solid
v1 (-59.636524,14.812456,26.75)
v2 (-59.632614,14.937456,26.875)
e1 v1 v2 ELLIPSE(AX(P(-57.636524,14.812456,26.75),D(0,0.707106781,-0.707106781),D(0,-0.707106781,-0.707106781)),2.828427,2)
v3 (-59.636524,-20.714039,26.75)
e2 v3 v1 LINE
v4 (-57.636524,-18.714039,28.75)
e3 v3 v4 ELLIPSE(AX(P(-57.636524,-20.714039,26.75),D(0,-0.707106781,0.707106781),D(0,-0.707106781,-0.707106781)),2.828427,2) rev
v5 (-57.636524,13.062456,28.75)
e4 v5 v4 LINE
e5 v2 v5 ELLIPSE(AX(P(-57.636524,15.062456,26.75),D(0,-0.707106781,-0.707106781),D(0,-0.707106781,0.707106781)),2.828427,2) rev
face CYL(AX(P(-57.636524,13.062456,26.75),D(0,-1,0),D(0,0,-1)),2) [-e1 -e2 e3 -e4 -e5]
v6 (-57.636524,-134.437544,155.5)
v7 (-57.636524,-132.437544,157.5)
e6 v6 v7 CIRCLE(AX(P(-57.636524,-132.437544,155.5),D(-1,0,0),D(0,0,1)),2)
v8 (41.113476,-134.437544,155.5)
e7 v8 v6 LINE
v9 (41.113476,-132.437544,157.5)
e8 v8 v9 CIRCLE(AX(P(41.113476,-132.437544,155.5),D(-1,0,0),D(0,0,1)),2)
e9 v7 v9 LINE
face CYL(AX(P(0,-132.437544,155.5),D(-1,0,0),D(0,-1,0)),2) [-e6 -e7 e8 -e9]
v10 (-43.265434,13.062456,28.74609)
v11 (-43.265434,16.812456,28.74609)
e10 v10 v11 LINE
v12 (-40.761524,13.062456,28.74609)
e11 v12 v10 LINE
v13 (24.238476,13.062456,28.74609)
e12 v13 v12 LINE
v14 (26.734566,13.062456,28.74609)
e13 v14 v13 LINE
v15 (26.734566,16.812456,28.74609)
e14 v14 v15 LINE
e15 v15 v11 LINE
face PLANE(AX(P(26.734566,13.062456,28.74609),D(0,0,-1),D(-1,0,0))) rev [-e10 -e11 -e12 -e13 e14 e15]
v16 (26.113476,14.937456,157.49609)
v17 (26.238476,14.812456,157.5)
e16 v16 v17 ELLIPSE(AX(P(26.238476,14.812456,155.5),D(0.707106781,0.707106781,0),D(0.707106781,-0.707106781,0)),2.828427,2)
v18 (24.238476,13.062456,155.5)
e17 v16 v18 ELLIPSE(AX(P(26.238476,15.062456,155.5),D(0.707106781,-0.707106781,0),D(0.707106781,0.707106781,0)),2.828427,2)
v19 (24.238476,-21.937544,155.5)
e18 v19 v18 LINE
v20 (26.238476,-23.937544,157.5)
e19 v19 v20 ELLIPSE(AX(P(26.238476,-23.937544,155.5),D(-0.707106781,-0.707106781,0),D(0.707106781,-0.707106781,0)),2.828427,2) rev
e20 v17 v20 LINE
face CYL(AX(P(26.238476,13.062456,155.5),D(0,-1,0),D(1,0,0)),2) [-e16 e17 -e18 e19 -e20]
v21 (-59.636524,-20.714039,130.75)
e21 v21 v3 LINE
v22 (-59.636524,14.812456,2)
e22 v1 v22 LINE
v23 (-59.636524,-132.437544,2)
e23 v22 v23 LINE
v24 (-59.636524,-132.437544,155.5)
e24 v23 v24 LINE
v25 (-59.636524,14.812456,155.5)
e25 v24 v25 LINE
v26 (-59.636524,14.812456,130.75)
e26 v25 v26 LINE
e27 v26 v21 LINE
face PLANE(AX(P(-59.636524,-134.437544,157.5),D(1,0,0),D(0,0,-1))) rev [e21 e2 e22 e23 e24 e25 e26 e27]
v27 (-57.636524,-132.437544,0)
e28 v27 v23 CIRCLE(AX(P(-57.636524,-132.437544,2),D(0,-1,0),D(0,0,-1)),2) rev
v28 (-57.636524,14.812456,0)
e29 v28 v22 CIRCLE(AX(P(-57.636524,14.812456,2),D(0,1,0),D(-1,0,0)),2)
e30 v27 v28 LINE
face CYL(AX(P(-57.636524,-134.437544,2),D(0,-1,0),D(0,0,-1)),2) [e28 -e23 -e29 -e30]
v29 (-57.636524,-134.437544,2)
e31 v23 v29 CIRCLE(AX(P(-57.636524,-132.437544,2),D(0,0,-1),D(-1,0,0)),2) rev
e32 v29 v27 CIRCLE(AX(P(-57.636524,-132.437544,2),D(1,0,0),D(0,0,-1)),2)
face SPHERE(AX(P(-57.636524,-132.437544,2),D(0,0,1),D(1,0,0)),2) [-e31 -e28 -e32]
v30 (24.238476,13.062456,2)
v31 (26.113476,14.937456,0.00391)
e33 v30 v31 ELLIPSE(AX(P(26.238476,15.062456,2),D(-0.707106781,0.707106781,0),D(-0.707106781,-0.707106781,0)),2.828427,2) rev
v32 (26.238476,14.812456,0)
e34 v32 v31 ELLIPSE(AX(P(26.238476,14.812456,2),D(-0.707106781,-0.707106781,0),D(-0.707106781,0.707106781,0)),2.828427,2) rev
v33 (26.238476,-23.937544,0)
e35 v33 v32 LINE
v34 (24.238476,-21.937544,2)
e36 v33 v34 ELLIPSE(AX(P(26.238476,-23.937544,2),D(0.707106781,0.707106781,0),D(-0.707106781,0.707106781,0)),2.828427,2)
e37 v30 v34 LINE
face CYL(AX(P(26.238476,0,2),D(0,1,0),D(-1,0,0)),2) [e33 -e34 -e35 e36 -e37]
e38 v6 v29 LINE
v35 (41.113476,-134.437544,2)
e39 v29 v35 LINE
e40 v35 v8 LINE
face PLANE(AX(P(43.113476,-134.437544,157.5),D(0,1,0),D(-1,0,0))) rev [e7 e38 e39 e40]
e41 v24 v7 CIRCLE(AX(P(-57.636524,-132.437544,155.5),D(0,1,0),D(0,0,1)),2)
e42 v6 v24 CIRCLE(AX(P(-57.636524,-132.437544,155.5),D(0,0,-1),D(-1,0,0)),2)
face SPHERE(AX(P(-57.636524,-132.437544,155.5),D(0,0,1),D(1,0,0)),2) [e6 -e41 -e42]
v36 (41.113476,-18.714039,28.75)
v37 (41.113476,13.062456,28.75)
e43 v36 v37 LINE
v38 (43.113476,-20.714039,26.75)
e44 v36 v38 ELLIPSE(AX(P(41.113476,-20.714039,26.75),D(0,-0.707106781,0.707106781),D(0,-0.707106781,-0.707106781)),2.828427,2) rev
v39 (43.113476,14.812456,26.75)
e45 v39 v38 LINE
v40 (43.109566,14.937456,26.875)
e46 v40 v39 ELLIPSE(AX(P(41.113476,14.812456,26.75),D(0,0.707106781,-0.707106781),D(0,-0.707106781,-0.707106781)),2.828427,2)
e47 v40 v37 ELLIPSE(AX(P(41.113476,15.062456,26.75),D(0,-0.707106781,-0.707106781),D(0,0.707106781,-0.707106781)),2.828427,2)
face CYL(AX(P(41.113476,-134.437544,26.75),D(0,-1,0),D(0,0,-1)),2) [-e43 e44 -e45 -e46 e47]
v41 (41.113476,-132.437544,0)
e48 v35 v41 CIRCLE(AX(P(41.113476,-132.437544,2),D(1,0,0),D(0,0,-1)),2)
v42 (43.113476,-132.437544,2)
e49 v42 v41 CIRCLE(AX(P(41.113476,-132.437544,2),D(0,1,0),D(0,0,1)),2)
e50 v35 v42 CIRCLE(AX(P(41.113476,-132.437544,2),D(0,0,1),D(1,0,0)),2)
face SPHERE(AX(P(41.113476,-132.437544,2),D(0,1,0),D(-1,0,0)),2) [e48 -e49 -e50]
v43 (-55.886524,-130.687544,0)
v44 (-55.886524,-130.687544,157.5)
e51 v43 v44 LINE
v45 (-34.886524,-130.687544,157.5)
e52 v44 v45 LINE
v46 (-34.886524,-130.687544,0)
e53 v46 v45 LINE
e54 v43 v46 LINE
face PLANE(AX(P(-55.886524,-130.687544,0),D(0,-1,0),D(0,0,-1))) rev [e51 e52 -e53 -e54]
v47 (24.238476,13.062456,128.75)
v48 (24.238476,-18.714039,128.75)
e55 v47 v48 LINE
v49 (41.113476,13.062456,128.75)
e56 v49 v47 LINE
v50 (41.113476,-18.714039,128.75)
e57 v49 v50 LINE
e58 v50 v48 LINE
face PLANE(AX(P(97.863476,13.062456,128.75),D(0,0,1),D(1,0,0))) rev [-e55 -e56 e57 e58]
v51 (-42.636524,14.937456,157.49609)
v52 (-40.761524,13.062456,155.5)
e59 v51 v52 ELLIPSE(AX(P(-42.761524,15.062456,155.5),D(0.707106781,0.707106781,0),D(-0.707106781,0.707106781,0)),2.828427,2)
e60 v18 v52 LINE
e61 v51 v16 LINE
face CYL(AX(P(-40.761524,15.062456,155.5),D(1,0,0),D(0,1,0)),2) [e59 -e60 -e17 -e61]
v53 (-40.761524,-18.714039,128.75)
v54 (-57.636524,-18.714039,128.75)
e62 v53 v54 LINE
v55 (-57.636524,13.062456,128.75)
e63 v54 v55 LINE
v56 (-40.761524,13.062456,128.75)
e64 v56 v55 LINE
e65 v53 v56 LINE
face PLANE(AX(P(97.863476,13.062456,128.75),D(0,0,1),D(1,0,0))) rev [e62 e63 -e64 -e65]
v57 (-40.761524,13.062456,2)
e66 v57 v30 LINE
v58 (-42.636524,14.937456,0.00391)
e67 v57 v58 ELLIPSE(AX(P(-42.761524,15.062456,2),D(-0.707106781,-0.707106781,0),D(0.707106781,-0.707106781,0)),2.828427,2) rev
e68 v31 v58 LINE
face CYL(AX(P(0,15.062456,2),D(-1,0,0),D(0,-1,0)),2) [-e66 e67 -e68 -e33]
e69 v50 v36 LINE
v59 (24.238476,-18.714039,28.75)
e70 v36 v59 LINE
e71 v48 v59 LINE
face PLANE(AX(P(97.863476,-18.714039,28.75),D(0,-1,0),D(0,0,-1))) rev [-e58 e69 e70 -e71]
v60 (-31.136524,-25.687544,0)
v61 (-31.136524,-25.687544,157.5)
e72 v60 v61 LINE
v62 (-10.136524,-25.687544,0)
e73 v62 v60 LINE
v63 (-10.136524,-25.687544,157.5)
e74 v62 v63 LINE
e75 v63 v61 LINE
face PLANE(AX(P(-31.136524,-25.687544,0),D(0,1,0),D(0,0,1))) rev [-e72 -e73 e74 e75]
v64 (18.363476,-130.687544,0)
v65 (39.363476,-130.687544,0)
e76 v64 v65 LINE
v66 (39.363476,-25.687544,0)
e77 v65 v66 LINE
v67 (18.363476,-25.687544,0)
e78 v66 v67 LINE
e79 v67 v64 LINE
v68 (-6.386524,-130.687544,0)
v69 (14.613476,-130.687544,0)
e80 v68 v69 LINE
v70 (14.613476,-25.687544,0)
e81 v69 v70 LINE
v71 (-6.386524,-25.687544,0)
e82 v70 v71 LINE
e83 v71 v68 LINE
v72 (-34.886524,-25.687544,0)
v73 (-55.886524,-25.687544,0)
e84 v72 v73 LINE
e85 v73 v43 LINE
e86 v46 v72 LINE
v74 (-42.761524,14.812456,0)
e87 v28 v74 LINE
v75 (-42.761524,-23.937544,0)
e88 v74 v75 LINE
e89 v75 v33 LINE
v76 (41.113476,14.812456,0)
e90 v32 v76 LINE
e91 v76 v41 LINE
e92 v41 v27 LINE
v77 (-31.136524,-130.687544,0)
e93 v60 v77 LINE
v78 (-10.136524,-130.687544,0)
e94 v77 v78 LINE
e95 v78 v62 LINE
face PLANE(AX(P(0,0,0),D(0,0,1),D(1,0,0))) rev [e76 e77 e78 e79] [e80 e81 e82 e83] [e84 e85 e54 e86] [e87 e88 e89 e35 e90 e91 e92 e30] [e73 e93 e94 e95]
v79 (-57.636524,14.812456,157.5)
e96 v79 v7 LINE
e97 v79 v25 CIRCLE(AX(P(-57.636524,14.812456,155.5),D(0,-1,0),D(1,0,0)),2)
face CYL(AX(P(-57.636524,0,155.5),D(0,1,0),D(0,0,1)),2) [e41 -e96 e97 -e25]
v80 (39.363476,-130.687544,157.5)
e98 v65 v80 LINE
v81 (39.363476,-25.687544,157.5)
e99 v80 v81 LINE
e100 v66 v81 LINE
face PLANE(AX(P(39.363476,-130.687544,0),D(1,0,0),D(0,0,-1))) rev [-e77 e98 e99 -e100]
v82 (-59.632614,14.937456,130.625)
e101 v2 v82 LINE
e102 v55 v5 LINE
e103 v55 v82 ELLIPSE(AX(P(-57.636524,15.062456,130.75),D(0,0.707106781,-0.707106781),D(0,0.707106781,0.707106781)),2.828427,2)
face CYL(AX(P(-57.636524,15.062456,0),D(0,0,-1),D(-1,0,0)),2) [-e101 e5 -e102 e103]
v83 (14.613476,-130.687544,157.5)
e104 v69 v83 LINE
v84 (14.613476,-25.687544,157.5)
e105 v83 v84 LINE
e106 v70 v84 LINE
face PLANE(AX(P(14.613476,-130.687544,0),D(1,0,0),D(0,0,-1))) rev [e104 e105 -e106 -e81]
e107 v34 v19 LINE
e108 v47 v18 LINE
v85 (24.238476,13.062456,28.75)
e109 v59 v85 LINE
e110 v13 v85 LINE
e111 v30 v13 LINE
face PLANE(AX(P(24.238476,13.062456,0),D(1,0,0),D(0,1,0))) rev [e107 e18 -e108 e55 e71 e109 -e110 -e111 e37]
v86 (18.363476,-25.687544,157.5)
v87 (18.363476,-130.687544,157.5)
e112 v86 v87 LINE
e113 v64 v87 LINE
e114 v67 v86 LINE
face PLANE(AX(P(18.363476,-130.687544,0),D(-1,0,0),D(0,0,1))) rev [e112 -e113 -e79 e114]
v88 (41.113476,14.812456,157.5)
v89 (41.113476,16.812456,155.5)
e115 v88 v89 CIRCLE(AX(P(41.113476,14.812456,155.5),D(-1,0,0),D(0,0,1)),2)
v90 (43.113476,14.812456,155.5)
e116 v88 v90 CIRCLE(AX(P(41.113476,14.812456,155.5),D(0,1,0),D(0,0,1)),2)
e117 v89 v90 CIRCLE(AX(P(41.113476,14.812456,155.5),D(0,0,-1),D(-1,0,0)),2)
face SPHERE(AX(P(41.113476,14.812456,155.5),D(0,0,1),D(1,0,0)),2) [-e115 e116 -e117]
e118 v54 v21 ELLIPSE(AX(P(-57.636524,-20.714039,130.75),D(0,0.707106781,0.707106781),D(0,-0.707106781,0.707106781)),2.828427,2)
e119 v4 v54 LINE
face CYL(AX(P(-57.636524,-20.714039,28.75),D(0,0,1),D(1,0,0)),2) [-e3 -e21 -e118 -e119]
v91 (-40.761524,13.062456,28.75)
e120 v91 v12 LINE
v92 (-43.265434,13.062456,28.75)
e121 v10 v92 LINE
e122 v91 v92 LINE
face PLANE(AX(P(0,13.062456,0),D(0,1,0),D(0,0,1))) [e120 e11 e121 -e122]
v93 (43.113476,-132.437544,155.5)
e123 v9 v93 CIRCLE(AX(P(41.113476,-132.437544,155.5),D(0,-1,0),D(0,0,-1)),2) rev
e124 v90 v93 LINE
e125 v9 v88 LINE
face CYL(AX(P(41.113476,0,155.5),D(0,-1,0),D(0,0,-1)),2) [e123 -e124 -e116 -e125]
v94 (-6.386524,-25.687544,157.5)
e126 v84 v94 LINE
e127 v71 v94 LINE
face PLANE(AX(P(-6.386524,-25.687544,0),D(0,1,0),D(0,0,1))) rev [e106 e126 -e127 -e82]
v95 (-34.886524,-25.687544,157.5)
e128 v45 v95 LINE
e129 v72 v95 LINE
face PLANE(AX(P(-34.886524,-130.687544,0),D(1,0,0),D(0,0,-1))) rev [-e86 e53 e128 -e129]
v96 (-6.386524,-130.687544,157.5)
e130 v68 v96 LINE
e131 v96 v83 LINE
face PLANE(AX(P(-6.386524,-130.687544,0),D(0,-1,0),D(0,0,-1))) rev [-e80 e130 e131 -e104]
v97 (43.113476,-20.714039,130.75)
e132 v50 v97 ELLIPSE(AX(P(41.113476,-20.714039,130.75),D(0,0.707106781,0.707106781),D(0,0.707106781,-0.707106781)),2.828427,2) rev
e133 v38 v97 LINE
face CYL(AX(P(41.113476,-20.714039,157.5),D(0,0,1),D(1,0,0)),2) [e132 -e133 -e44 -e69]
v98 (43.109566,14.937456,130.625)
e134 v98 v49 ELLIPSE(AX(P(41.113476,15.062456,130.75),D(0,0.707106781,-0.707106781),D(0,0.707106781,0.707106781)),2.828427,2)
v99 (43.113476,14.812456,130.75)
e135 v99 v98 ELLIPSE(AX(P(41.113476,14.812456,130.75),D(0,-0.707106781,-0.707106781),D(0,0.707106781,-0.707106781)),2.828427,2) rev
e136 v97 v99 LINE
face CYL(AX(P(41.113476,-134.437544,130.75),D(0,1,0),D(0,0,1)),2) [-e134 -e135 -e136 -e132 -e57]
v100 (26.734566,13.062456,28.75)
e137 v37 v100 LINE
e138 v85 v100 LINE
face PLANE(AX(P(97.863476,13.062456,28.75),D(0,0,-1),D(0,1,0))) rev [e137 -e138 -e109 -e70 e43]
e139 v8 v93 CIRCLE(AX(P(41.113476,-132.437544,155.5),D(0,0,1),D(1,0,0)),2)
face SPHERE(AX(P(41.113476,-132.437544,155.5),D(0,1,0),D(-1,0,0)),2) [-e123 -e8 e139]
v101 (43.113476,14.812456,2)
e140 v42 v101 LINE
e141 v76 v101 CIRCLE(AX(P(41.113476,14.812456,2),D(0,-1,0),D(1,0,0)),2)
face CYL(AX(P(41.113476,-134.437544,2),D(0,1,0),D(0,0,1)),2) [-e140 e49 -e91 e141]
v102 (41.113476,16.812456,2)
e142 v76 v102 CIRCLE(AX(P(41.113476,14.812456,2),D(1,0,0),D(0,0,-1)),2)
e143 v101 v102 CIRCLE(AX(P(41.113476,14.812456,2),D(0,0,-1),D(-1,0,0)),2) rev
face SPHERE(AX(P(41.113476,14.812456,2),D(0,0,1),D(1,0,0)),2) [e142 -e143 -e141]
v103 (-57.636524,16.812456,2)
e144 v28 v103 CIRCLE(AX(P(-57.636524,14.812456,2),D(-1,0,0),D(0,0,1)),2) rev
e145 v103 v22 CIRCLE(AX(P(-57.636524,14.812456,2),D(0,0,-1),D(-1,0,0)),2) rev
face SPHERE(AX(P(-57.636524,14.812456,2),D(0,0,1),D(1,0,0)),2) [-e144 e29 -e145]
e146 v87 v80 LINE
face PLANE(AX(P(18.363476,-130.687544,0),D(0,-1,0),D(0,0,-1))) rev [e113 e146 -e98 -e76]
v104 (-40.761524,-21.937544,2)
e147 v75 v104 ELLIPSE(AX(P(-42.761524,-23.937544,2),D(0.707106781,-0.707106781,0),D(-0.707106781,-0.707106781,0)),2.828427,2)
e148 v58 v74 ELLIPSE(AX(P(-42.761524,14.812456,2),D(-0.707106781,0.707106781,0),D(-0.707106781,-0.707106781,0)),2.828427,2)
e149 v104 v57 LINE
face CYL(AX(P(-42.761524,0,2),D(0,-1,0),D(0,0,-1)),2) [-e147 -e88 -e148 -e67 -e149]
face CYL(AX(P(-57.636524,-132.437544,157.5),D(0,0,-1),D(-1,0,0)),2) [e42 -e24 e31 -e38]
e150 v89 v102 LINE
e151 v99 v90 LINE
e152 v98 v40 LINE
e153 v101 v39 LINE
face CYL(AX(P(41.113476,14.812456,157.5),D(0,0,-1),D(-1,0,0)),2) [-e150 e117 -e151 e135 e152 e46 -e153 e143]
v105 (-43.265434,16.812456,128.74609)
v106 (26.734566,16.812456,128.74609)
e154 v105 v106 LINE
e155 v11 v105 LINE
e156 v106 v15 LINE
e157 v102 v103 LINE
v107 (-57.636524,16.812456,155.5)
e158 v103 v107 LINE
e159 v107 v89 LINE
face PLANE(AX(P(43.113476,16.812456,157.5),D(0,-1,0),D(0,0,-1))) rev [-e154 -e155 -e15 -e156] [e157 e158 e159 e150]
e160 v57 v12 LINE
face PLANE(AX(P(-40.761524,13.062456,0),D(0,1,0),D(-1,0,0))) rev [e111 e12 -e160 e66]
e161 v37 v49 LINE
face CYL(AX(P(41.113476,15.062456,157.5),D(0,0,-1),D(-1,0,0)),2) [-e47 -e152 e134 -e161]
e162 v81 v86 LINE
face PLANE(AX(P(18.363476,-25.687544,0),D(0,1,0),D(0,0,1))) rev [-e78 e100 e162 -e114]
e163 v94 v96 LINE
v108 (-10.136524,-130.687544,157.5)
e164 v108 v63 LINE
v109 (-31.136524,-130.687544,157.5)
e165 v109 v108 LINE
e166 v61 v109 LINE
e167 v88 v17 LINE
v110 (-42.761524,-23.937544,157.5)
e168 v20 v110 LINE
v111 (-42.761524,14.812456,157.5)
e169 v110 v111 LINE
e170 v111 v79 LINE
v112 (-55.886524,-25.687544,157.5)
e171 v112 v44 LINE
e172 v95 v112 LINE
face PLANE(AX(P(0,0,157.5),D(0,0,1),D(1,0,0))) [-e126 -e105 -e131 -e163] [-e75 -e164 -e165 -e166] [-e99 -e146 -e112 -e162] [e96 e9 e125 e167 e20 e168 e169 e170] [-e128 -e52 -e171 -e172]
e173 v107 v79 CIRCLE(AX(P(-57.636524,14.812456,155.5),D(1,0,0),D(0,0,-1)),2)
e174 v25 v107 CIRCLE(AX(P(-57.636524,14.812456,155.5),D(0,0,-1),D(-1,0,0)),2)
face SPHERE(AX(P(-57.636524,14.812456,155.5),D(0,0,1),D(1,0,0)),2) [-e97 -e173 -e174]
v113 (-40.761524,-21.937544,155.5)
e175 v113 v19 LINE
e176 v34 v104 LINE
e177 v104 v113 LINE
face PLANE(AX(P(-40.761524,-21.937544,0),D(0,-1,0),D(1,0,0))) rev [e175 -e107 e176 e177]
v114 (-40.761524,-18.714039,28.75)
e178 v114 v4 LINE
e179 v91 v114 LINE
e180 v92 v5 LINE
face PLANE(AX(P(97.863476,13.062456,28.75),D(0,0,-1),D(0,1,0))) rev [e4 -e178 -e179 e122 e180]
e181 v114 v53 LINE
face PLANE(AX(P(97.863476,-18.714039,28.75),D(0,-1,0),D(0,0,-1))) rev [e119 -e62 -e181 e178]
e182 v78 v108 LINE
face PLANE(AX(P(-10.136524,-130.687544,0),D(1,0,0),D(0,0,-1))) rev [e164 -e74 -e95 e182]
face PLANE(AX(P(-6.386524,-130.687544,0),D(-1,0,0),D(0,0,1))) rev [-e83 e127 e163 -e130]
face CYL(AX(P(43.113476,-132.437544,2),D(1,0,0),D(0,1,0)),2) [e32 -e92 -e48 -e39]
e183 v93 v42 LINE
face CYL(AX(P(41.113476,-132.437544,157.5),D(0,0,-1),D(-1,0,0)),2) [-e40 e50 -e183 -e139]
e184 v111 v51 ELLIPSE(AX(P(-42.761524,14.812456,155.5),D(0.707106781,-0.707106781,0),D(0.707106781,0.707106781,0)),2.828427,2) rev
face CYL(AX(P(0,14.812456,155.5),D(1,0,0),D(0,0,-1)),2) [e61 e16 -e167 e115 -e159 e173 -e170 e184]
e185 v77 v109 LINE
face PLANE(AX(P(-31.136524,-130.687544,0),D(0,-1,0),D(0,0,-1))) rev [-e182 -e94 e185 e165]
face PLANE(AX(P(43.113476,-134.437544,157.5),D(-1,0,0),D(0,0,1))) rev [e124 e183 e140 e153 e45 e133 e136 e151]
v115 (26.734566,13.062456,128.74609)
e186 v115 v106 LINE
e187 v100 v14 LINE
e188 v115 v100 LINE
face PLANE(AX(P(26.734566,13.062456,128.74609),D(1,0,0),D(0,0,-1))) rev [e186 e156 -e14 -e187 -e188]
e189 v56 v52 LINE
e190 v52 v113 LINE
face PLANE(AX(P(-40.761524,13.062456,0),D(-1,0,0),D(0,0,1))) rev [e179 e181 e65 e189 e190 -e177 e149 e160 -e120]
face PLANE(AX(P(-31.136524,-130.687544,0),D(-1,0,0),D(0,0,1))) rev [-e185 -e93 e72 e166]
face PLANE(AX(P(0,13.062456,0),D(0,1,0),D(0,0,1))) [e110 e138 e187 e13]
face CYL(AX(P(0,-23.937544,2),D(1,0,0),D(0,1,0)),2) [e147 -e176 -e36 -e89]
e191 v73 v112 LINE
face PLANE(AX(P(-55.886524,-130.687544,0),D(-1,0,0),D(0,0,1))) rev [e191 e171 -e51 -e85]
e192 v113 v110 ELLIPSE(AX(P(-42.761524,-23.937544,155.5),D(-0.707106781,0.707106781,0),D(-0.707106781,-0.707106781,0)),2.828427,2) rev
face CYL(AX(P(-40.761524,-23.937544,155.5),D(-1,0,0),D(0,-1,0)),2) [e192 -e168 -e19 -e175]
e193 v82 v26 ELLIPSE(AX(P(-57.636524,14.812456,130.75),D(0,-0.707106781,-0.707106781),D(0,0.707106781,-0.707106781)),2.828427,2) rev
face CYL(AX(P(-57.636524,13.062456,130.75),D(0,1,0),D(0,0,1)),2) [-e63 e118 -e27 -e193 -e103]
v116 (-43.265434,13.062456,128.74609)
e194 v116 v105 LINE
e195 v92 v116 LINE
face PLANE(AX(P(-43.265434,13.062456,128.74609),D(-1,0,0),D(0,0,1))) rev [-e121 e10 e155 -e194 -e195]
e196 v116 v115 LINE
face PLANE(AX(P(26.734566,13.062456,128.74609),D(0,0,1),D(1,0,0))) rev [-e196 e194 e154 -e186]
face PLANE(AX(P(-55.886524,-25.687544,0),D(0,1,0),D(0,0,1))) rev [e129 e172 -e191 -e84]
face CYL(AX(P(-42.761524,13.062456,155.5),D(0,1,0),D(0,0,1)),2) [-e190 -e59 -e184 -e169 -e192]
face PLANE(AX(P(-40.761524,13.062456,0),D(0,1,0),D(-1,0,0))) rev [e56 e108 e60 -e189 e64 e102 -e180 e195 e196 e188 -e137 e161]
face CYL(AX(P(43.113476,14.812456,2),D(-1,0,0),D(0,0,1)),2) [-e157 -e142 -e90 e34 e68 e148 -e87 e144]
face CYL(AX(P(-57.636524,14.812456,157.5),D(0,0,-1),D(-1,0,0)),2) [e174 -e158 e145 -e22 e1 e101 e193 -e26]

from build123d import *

# Parameters (mm, degrees)
SKETCH7_W           = 102.75
SKETCH7_H           = 151.25
BOSS_EXTRUDE4_DEPTH = 157.5
SKETCH9_W           = 65
SKETCH9_H           = 35
SKETCH9_W_2         = 21
SKETCH9_H_2         = 105
CUT_EXTRUDE5_DEPTH  = 157.5
SKETCH10_W          = 100
SKETCH10_H          = 31.776495021
CUT_EXTRUDE6_DEPTH  = 157.5
FILLET3_R           = 2
FILLET4_R           = 2
FILLET6_R           = 2
FILLET7_R           = 2
FILLET8_R           = 2
FILLET9_R           = 2
SKETCH13_W          = 70
SKETCH13_H          = 100
CUT_EXTRUDE7_DEPTH  = 3.75


with BuildPart() as part:
    # Sketch7 → Boss-Extrude4 (new body)
    with BuildSketch(Plane.XY):
        with Locations((-8.261523783, -58.812543528)):
            Rectangle(SKETCH7_W, SKETCH7_H)
    extrude(amount=BOSS_EXTRUDE4_DEPTH)

    # Sketch9 → Cut-Extrude5 (cut)
    with BuildSketch(Plane.XY.offset(157.5)):
        with Locations((-8.261523783, -4.437543528)):
            Rectangle(SKETCH9_W, SKETCH9_H)
        with Locations((-45.386523783, -78.187543528)):
            Rectangle(SKETCH9_W_2, SKETCH9_H_2)
        with Locations((-20.636523783, -78.187543528)):
            Rectangle(SKETCH9_W_2, SKETCH9_H_2)
        with Locations((4.113476217, -78.187543528)):
            Rectangle(SKETCH9_W_2, SKETCH9_H_2)
        with Locations((28.863476217, -78.187543528)):
            Rectangle(SKETCH9_W_2, SKETCH9_H_2)
    extrude(amount=-CUT_EXTRUDE5_DEPTH, mode=Mode.SUBTRACT)

    # Sketch10 → Cut-Extrude6 (cut)
    with BuildSketch(Plane.ZY.offset(59.636523783)):
        with Locations((78.75, -2.825791039)):
            Rectangle(SKETCH10_W, SKETCH10_H)
    extrude(amount=-CUT_EXTRUDE6_DEPTH, mode=Mode.SUBTRACT)

    # Fillet3
    fillet3_edges = [part.edges().sort_by_distance(p)[0] for p in [
        (43.113476217, 16.812456472, 78.75),
    ]]
    fillet(fillet3_edges, radius=FILLET3_R)

    # Fillet4
    fillet4_edges = [part.edges().sort_by_distance(p)[0] for p in [
        (-9.261523783, 16.812456472, 0),
        (-9.261523783, 16.812456472, 157.5),
        (42.52768978, 16.226670034, 0),
        (42.52768978, 16.226670034, 157.5),
        (43.113476217, -59.812543528, 157.5),
        (43.113476217, -59.812543528, 0),
        (-59.636523783, 16.812456472, 78.75),
    ]]
    fillet(fillet4_edges, radius=FILLET4_R)

    # Fillet6
    # the kernel refuses this fillet: 2 mm, written as the material it takes off along each edge
    with BuildSketch(Plane(origin=(-57.636523783, 14.812456472, 155.5), x_dir=(-1, 0, 0), z_dir=(0, 0, 1))) as fillet6_piece_1_section:
        Polygon((0, 0), (FILLET6_R, 0), (FILLET6_R, -FILLET6_R), (0, -FILLET6_R), align=None)
    fillet6_piece_1 = extrude(amount=FILLET6_R, mode=Mode.PRIVATE)
    fillet6_piece_1 = fillet6_piece_1 - Plane(origin=(-57.636523783, 14.812456472, 155.5), x_dir=(0.7071067811865475, -0.7071067811865475, 0), z_dir=(0, 0, 1)) * Sphere(FILLET6_R, mode=Mode.PRIVATE)
    add(fillet6_piece_1, mode=Mode.SUBTRACT)
    with BuildSketch(Plane(origin=(-57.636523783, 14.812456472, 2), x_dir=(-1, 0, 0), z_dir=(0, 0, -1))) as fillet6_piece_2_section:
        Polygon((0, 0), (FILLET6_R, 0), (FILLET6_R, FILLET6_R), (0, FILLET6_R), align=None)
    fillet6_piece_2 = extrude(amount=FILLET6_R, mode=Mode.PRIVATE)
    fillet6_piece_2 = fillet6_piece_2 - Plane(origin=(-57.636523783, 14.812456472, 2), x_dir=(0.7071067811865475, -0.7071067811865475, 0), z_dir=(0, 0, -1)) * Sphere(FILLET6_R, mode=Mode.PRIVATE)
    add(fillet6_piece_2, mode=Mode.SUBTRACT)
    with BuildSketch(Plane(origin=(-59.636523783, -139.437543528, 0), x_dir=(1, 0, 0), z_dir=(0, 1, 0))) as fillet6_piece_3:
        with BuildLine():
            CenterArc((FILLET6_R, -FILLET6_R), FILLET6_R, 90, 90)
            Line((0, -FILLET6_R), (0, 0))
            Line((0, 0), (FILLET6_R, 0))
        make_face()
    extrude(amount=154.25, mode=Mode.SUBTRACT)
    with BuildSketch(Plane(origin=(-59.636523783, -139.437543528, 157.5), x_dir=(1, 0, 0), z_dir=(0, 1, 0))) as fillet6_piece_4:
        with BuildLine():
            CenterArc((FILLET6_R, FILLET6_R), FILLET6_R, 180, 90)
            Line((0, FILLET6_R), (0, 0))
            Line((0, 0), (FILLET6_R, 0))
        make_face()
    extrude(amount=154.25, mode=Mode.SUBTRACT)
    with BuildSketch(Plane(origin=(-59.636523783, -134.437543528, -5), x_dir=(1, 0, 0), z_dir=(0, 0, 1))) as fillet6_piece_5:
        with BuildLine():
            CenterArc((FILLET6_R, FILLET6_R), FILLET6_R, 180, 90)
            Line((0, FILLET6_R), (0, 0))
            Line((0, 0), (FILLET6_R, 0))
        make_face()
    extrude(amount=167.5, mode=Mode.SUBTRACT)

    # Fillet7
    # the kernel refuses this fillet: 2 mm, written as the material it takes off along each edge
    with BuildSketch(Plane(origin=(-57.636523783, -132.437543528, 155.5), x_dir=(0, 0, 1), z_dir=(0, -1, 0))) as fillet7_piece_1_section:
        Polygon((0, 0), (FILLET7_R, 0), (FILLET7_R, FILLET7_R), (0, FILLET7_R), align=None)
    fillet7_piece_1 = extrude(amount=FILLET7_R, mode=Mode.PRIVATE)
    fillet7_piece_1 = fillet7_piece_1 - Plane(origin=(-57.636523783, -132.437543528, 155.5), x_dir=(0.7071067811865475, 0, -0.7071067811865475), z_dir=(0, -1, 0)) * Sphere(FILLET7_R, mode=Mode.PRIVATE)
    add(fillet7_piece_1, mode=Mode.SUBTRACT)
    with BuildSketch(Plane(origin=(-57.636523783, -132.437543528, 2), x_dir=(0, 0, -1), z_dir=(0, -1, 0))) as fillet7_piece_2_section:
        Polygon((0, 0), (FILLET7_R, 0), (FILLET7_R, -FILLET7_R), (0, -FILLET7_R), align=None)
    fillet7_piece_2 = extrude(amount=FILLET7_R, mode=Mode.PRIVATE)
    fillet7_piece_2 = fillet7_piece_2 - Plane(origin=(-57.636523783, -132.437543528, 2), x_dir=(0.7071067811865475, 0, 0.7071067811865475), z_dir=(0, -1, 0)) * Sphere(FILLET7_R, mode=Mode.PRIVATE)
    add(fillet7_piece_2, mode=Mode.SUBTRACT)
    with BuildSketch(Plane(origin=(43.113476217, -134.437543528, 2), x_dir=(0, 1, 0), z_dir=(0, 0, 1))) as fillet7_piece_3:
        with BuildLine():
            CenterArc((FILLET7_R, FILLET7_R), FILLET7_R, 180, 90)
            Line((0, FILLET7_R), (0, 0))
            Line((0, 0), (FILLET7_R, 0))
        make_face()
    extrude(amount=153.5, mode=Mode.SUBTRACT)
    with BuildSketch(Plane(origin=(41.113476217, -134.437543528, 155.5), x_dir=(0, 0, 1), z_dir=(-1, 0, 0))) as fillet7_piece_4:
        with BuildLine():
            CenterArc((2 - FILLET7_R, FILLET7_R), FILLET7_R, 270, 90)
            Line((2 - FILLET7_R, 0), (2, 0))
            Line((2, 0), (2, FILLET7_R))
        make_face()
    revolve(axis=Axis((41.113476217, -134.437543528, 155.5), (0, 1, 0)), revolution_arc=90, mode=Mode.SUBTRACT)
    with BuildSketch(Plane(origin=(41.113476217, -134.437543528, 2), x_dir=(0, 0, -1), z_dir=(-1, 0, 0))) as fillet7_piece_5:
        with BuildLine():
            CenterArc((2 - FILLET7_R, -FILLET7_R), FILLET7_R, 0, 90)
            Line((2 - FILLET7_R, 0), (2, 0))
            Line((2, 0), (2, -FILLET7_R))
        make_face()
    revolve(axis=Axis((41.113476217, -134.437543528, 2), (0, -1, 0)), revolution_arc=90, mode=Mode.SUBTRACT)
    with BuildSketch(Plane(origin=(41.113476217, -134.437543528, 0), x_dir=(0, 0, 1), z_dir=(-1, 0, 0))) as fillet7_piece_6:
        with BuildLine():
            CenterArc((FILLET7_R, FILLET7_R), FILLET7_R, 180, 90)
            Line((0, FILLET7_R), (0, 0))
            Line((0, 0), (FILLET7_R, 0))
        make_face()
    extrude(amount=98.75, mode=Mode.SUBTRACT)
    with BuildSketch(Plane(origin=(41.113476217, -134.437543528, 157.5), x_dir=(0, 0, -1), z_dir=(-1, 0, 0))) as fillet7_piece_7:
        with BuildLine():
            CenterArc((FILLET7_R, -FILLET7_R), FILLET7_R, 90, 90)
            Line((0, -FILLET7_R), (0, 0))
            Line((0, 0), (FILLET7_R, 0))
        make_face()
    extrude(amount=98.75, mode=Mode.SUBTRACT)

    # Fillet8
    # the kernel refuses this fillet: 2 mm, written as the material it takes off along each edge
    with BuildSketch(Plane(origin=(-40.761523783, -21.937543528, 0), x_dir=(-1, 0, 0), z_dir=(0, 1, 0)), Plane(origin=(24.238476217, 13.062456472, 0), x_dir=(1, 0, 0), z_dir=(0, -1, 0))) as fillet8_piece_1:
        with BuildLine():
            CenterArc((FILLET8_R, FILLET8_R), FILLET8_R, 180, 90)
            Line((0, FILLET8_R), (0, 0))
            Line((0, 0), (FILLET8_R, 0))
        make_face()
    extrude(amount=35, mode=Mode.SUBTRACT)
    with BuildSketch(Plane(origin=(-40.761523783, 13.062456472, 0), x_dir=(0, 0, 1), z_dir=(1, 0, 0))) as fillet8_piece_2:
        with BuildLine():
            CenterArc((FILLET8_R, -FILLET8_R), FILLET8_R, 90, 90)
            Line((0, -FILLET8_R), (0, 0))
            Line((0, 0), (FILLET8_R, 0))
        make_face()
    extrude(amount=65, mode=Mode.SUBTRACT)
    with BuildSketch(Plane(origin=(24.238476217, -21.937543528, 0), x_dir=(0, -1, 0), z_dir=(-1, 0, 0))) as fillet8_piece_3:
        with BuildLine():
            CenterArc((FILLET8_R, FILLET8_R), FILLET8_R, 180, 90)
            Line((0, FILLET8_R), (0, 0))
            Line((0, 0), (FILLET8_R, 0))
        make_face()
    extrude(amount=65, mode=Mode.SUBTRACT)
    with BuildSketch(Plane(origin=(-40.761523783, -26.937543528, 0), x_dir=(-1, 0, 0), z_dir=(0, 1, 0))) as fillet8_piece_4a_section:
        with BuildLine():
            CenterArc((FILLET8_R, FILLET8_R), FILLET8_R, 180, 90)
            Line((0, FILLET8_R), (0, 0))
            Line((0, 0), (FILLET8_R, 0))
        make_face()
    fillet8_piece_4a = extrude(amount=40, mode=Mode.PRIVATE)
    fillet8_piece_4a = split(fillet8_piece_4a, bisect_by=Plane(origin=(-40.761523783, -21.937543528, 0), z_dir=(0, -1, 0)), keep=Keep.TOP, mode=Mode.PRIVATE)
    with BuildSketch(Plane(origin=(24.238476217, -21.937543528, 0), x_dir=(0, -1, 0), z_dir=(-1, 0, 0))) as fillet8_piece_4b_section:
        with BuildLine():
            CenterArc((FILLET8_R, FILLET8_R), FILLET8_R, 180, 90)
            Line((0, FILLET8_R), (0, 0))
            Line((0, 0), (FILLET8_R, 0))
        make_face()
    fillet8_piece_4b = extrude(amount=70, mode=Mode.PRIVATE)
    fillet8_piece_4b = split(fillet8_piece_4b, bisect_by=Plane(origin=(-40.761523783, -21.937543528, 0), z_dir=(-1, 0, 0)), keep=Keep.TOP, mode=Mode.PRIVATE)
    fillet8_piece_4 = fillet8_piece_4a & fillet8_piece_4b
    add(fillet8_piece_4, mode=Mode.SUBTRACT)
    with BuildSketch(Plane(origin=(-45.761523783, 13.062456472, 0), x_dir=(0, 0, 1), z_dir=(1, 0, 0))) as fillet8_piece_5a_section:
        with BuildLine():
            CenterArc((FILLET8_R, -FILLET8_R), FILLET8_R, 90, 90)
            Line((0, -FILLET8_R), (0, 0))
            Line((0, 0), (FILLET8_R, 0))
        make_face()
    fillet8_piece_5a = extrude(amount=70, mode=Mode.PRIVATE)
    fillet8_piece_5a = split(fillet8_piece_5a, bisect_by=Plane(origin=(-40.761523783, 13.062456472, 0), z_dir=(-1, 0, 0)), keep=Keep.TOP, mode=Mode.PRIVATE)
    with BuildSketch(Plane(origin=(-40.761523783, -21.937543528, 0), x_dir=(-1, 0, 0), z_dir=(0, 1, 0))) as fillet8_piece_5b_section:
        with BuildLine():
            CenterArc((FILLET8_R, FILLET8_R), FILLET8_R, 180, 90)
            Line((0, FILLET8_R), (0, 0))
            Line((0, 0), (FILLET8_R, 0))
        make_face()
    fillet8_piece_5b = extrude(amount=40, mode=Mode.PRIVATE)
    fillet8_piece_5b = split(fillet8_piece_5b, bisect_by=Plane(origin=(-40.761523783, 13.062456472, 0), z_dir=(0, 1, 0)), keep=Keep.TOP, mode=Mode.PRIVATE)
    fillet8_piece_5 = fillet8_piece_5a & fillet8_piece_5b
    add(fillet8_piece_5, mode=Mode.SUBTRACT)
    with BuildSketch(Plane(origin=(-40.761523783, 13.062456472, 0), x_dir=(0, 0, 1), z_dir=(1, 0, 0))) as fillet8_piece_6a_section:
        with BuildLine():
            CenterArc((FILLET8_R, -FILLET8_R), FILLET8_R, 90, 90)
            Line((0, -FILLET8_R), (0, 0))
            Line((0, 0), (FILLET8_R, 0))
        make_face()
    fillet8_piece_6a = extrude(amount=70, mode=Mode.PRIVATE)
    fillet8_piece_6a = split(fillet8_piece_6a, bisect_by=Plane(origin=(24.238476217, 13.062456472, 0), z_dir=(1, 0, 0)), keep=Keep.TOP, mode=Mode.PRIVATE)
    with BuildSketch(Plane(origin=(24.238476217, 18.062456472, 0), x_dir=(1, 0, 0), z_dir=(0, -1, 0))) as fillet8_piece_6b_section:
        with BuildLine():
            CenterArc((FILLET8_R, FILLET8_R), FILLET8_R, 180, 90)
            Line((0, FILLET8_R), (0, 0))
            Line((0, 0), (FILLET8_R, 0))
        make_face()
    fillet8_piece_6b = extrude(amount=40, mode=Mode.PRIVATE)
    fillet8_piece_6b = split(fillet8_piece_6b, bisect_by=Plane(origin=(24.238476217, 13.062456472, 0), z_dir=(0, 1, 0)), keep=Keep.TOP, mode=Mode.PRIVATE)
    fillet8_piece_6 = fillet8_piece_6a & fillet8_piece_6b
    add(fillet8_piece_6, mode=Mode.SUBTRACT)
    with BuildSketch(Plane(origin=(24.238476217, 13.062456472, 0), x_dir=(1, 0, 0), z_dir=(0, -1, 0))) as fillet8_piece_7a_section:
        with BuildLine():
            CenterArc((FILLET8_R, FILLET8_R), FILLET8_R, 180, 90)
            Line((0, FILLET8_R), (0, 0))
            Line((0, 0), (FILLET8_R, 0))
        make_face()
    fillet8_piece_7a = extrude(amount=40, mode=Mode.PRIVATE)
    fillet8_piece_7a = split(fillet8_piece_7a, bisect_by=Plane(origin=(24.238476217, -21.937543528, 0), z_dir=(0, -1, 0)), keep=Keep.TOP, mode=Mode.PRIVATE)
    with BuildSketch(Plane(origin=(29.238476217, -21.937543528, 0), x_dir=(0, -1, 0), z_dir=(-1, 0, 0))) as fillet8_piece_7b_section:
        with BuildLine():
            CenterArc((FILLET8_R, FILLET8_R), FILLET8_R, 180, 90)
            Line((0, FILLET8_R), (0, 0))
            Line((0, 0), (FILLET8_R, 0))
        make_face()
    fillet8_piece_7b = extrude(amount=70, mode=Mode.PRIVATE)
    fillet8_piece_7b = split(fillet8_piece_7b, bisect_by=Plane(origin=(24.238476217, -21.937543528, 0), z_dir=(1, 0, 0)), keep=Keep.TOP, mode=Mode.PRIVATE)
    fillet8_piece_7 = fillet8_piece_7a & fillet8_piece_7b
    add(fillet8_piece_7, mode=Mode.SUBTRACT)

    # Fillet9
    # the kernel refuses this fillet: 2 mm, written as the material it takes off along each edge
    with BuildSketch(Plane(origin=(-59.636523783, -18.714038549, 28.75), x_dir=(1, 0, 0), z_dir=(0, 1, 0))) as fillet9_piece_1:
        with BuildLine():
            CenterArc((FILLET9_R, FILLET9_R), FILLET9_R, 180, 90)
            Line((0, FILLET9_R), (0, 0))
            Line((0, 0), (FILLET9_R, 0))
        make_face()
    extrude(amount=31.776495021, mode=Mode.SUBTRACT)
    with BuildSketch(Plane(origin=(-59.636523783, -18.714038549, 128.75), x_dir=(0, -1, 0), z_dir=(0, 0, -1)), Plane(origin=(-59.636523783, 13.062456472, 28.75), x_dir=(0, 1, 0), z_dir=(0, 0, 1)), Plane(origin=(43.113476217, 13.062456472, 128.75), x_dir=(0, 1, 0), z_dir=(0, 0, -1)), Plane(origin=(43.113476217, -18.714038549, 28.75), x_dir=(0, -1, 0), z_dir=(0, 0, 1))) as fillet9_piece_2:
        with BuildLine():
            CenterArc((FILLET9_R, -FILLET9_R), FILLET9_R, 90, 90)
            Line((0, -FILLET9_R), (0, 0))
            Line((0, 0), (FILLET9_R, 0))
        make_face()
    extrude(amount=100, mode=Mode.SUBTRACT)
    with BuildSketch(Plane(origin=(-59.636523783, 13.062456472, 128.75), x_dir=(0, 0, 1), z_dir=(0, -1, 0)), Plane(origin=(43.113476217, 13.062456472, 28.75), x_dir=(0, 0, -1), z_dir=(0, -1, 0)), Plane(origin=(43.113476217, -18.714038549, 128.75), x_dir=(0, 0, 1), z_dir=(0, 1, 0))) as fillet9_piece_3:
        with BuildLine():
            CenterArc((FILLET9_R, -FILLET9_R), FILLET9_R, 90, 90)
            Line((0, -FILLET9_R), (0, 0))
            Line((0, 0), (FILLET9_R, 0))
        make_face()
    extrude(amount=31.776495021, mode=Mode.SUBTRACT)
    with BuildSketch(Plane(origin=(-40.761523783, -21.937543528, 157.5), x_dir=(0, 0, -1), z_dir=(0, 1, 0)), Plane(origin=(24.238476217, 13.062456472, 157.5), x_dir=(0, 0, -1), z_dir=(0, -1, 0))) as fillet9_piece_4:
        with BuildLine():
            CenterArc((FILLET9_R, FILLET9_R), FILLET9_R, 180, 90)
            Line((0, FILLET9_R), (0, 0))
            Line((0, 0), (FILLET9_R, 0))
        make_face()
    extrude(amount=35, mode=Mode.SUBTRACT)
    with BuildSketch(Plane(origin=(24.238476217, -21.937543528, 157.5), x_dir=(0, 0, -1), z_dir=(-1, 0, 0))) as fillet9_piece_5:
        with BuildLine():
            CenterArc((FILLET9_R, FILLET9_R), FILLET9_R, 180, 90)
            Line((0, FILLET9_R), (0, 0))
            Line((0, 0), (FILLET9_R, 0))
        make_face()
    extrude(amount=65, mode=Mode.SUBTRACT)
    with BuildSketch(Plane(origin=(-40.761523783, 13.062456472, 157.5), x_dir=(0, 1, 0), z_dir=(1, 0, 0))) as fillet9_piece_6:
        with BuildLine():
            CenterArc((FILLET9_R, -FILLET9_R), FILLET9_R, 90, 90)
            Line((0, -FILLET9_R), (0, 0))
            Line((0, 0), (FILLET9_R, 0))
        make_face()
    extrude(amount=65, mode=Mode.SUBTRACT)
    with BuildSketch(Plane(origin=(-59.636523783, -23.714038549, 28.75), x_dir=(1, 0, 0), z_dir=(0, 1, 0))) as fillet9_piece_7a_section:
        with BuildLine():
            CenterArc((FILLET9_R, FILLET9_R), FILLET9_R, 180, 90)
            Line((0, FILLET9_R), (0, 0))
            Line((0, 0), (FILLET9_R, 0))
        make_face()
    fillet9_piece_7a = extrude(amount=36.776495021, mode=Mode.PRIVATE)
    fillet9_piece_7a = split(fillet9_piece_7a, bisect_by=Plane(origin=(-59.636523783, -18.714038549, 28.75), z_dir=(0, -1, 0)), keep=Keep.TOP, mode=Mode.PRIVATE)
    with BuildSketch(Plane(origin=(-59.636523783, -18.714038549, 128.75), x_dir=(0, -1, 0), z_dir=(0, 0, -1))) as fillet9_piece_7b_section:
        with BuildLine():
            CenterArc((FILLET9_R, -FILLET9_R), FILLET9_R, 90, 90)
            Line((0, -FILLET9_R), (0, 0))
            Line((0, 0), (FILLET9_R, 0))
        make_face()
    fillet9_piece_7b = extrude(amount=105, mode=Mode.PRIVATE)
    fillet9_piece_7b = split(fillet9_piece_7b, bisect_by=Plane(origin=(-59.636523783, -18.714038549, 28.75), z_dir=(0, 0, -1)), keep=Keep.TOP, mode=Mode.PRIVATE)
    fillet9_piece_7 = fillet9_piece_7a & fillet9_piece_7b
    add(fillet9_piece_7, mode=Mode.SUBTRACT)
    with BuildSketch(Plane(origin=(-59.636523783, -18.714038549, 28.75), x_dir=(1, 0, 0), z_dir=(0, 1, 0))) as fillet9_piece_8a_section:
        with BuildLine():
            CenterArc((FILLET9_R, FILLET9_R), FILLET9_R, 180, 90)
            Line((0, FILLET9_R), (0, 0))
            Line((0, 0), (FILLET9_R, 0))
        make_face()
    fillet9_piece_8a = extrude(amount=36.776495021, mode=Mode.PRIVATE)
    fillet9_piece_8a = split(fillet9_piece_8a, bisect_by=Plane(origin=(-59.636523783, 13.062456472, 28.75), z_dir=(0, 1, 0)), keep=Keep.TOP, mode=Mode.PRIVATE)
    with BuildSketch(Plane(origin=(-59.636523783, 13.062456472, 23.75), x_dir=(0, 1, 0), z_dir=(0, 0, 1))) as fillet9_piece_8b_section:
        with BuildLine():
            CenterArc((FILLET9_R, -FILLET9_R), FILLET9_R, 90, 90)
            Line((0, -FILLET9_R), (0, 0))
            Line((0, 0), (FILLET9_R, 0))
        make_face()
    fillet9_piece_8b = extrude(amount=105, mode=Mode.PRIVATE)
    fillet9_piece_8b = split(fillet9_piece_8b, bisect_by=Plane(origin=(-59.636523783, 13.062456472, 28.75), z_dir=(0, 0, -1)), keep=Keep.TOP, mode=Mode.PRIVATE)
    fillet9_piece_8 = fillet9_piece_8a & fillet9_piece_8b
    add(fillet9_piece_8, mode=Mode.SUBTRACT)
    with BuildSketch(Plane(origin=(-59.636523783, -18.714038549, 133.75), x_dir=(0, -1, 0), z_dir=(0, 0, -1))) as fillet9_piece_9a_section:
        with BuildLine():
            CenterArc((FILLET9_R, -FILLET9_R), FILLET9_R, 90, 90)
            Line((0, -FILLET9_R), (0, 0))
            Line((0, 0), (FILLET9_R, 0))
        make_face()
    fillet9_piece_9a = extrude(amount=105, mode=Mode.PRIVATE)
    fillet9_piece_9a = split(fillet9_piece_9a, bisect_by=Plane(origin=(-59.636523783, -18.714038549, 128.75), z_dir=(0, 0, 1)), keep=Keep.TOP, mode=Mode.PRIVATE)
    with BuildSketch(Plane(origin=(-59.636523783, 13.062456472, 128.75), x_dir=(0, 0, 1), z_dir=(0, -1, 0))) as fillet9_piece_9b_section:
        with BuildLine():
            CenterArc((FILLET9_R, -FILLET9_R), FILLET9_R, 90, 90)
            Line((0, -FILLET9_R), (0, 0))
            Line((0, 0), (FILLET9_R, 0))
        make_face()
    fillet9_piece_9b = extrude(amount=36.776495021, mode=Mode.PRIVATE)
    fillet9_piece_9b = split(fillet9_piece_9b, bisect_by=Plane(origin=(-59.636523783, -18.714038549, 128.75), z_dir=(0, -1, 0)), keep=Keep.TOP, mode=Mode.PRIVATE)
    fillet9_piece_9 = fillet9_piece_9a & fillet9_piece_9b
    add(fillet9_piece_9, mode=Mode.SUBTRACT)
    with BuildSketch(Plane(origin=(-59.636523783, 13.062456472, 28.75), x_dir=(0, 1, 0), z_dir=(0, 0, 1))) as fillet9_piece_10a_section:
        with BuildLine():
            CenterArc((FILLET9_R, -FILLET9_R), FILLET9_R, 90, 90)
            Line((0, -FILLET9_R), (0, 0))
            Line((0, 0), (FILLET9_R, 0))
        make_face()
    fillet9_piece_10a = extrude(amount=105, mode=Mode.PRIVATE)
    fillet9_piece_10a = split(fillet9_piece_10a, bisect_by=Plane(origin=(-59.636523783, 13.062456472, 128.75), z_dir=(0, 0, 1)), keep=Keep.TOP, mode=Mode.PRIVATE)
    with BuildSketch(Plane(origin=(-59.636523783, 18.062456472, 128.75), x_dir=(0, 0, 1), z_dir=(0, -1, 0))) as fillet9_piece_10b_section:
        with BuildLine():
            CenterArc((FILLET9_R, -FILLET9_R), FILLET9_R, 90, 90)
            Line((0, -FILLET9_R), (0, 0))
            Line((0, 0), (FILLET9_R, 0))
        make_face()
    fillet9_piece_10b = extrude(amount=36.776495021, mode=Mode.PRIVATE)
    fillet9_piece_10b = split(fillet9_piece_10b, bisect_by=Plane(origin=(-59.636523783, 13.062456472, 128.75), z_dir=(0, 1, 0)), keep=Keep.TOP, mode=Mode.PRIVATE)
    fillet9_piece_10 = fillet9_piece_10a & fillet9_piece_10b
    add(fillet9_piece_10, mode=Mode.SUBTRACT)
    with BuildSketch(Plane(origin=(-40.761523783, -26.937543528, 157.5), x_dir=(0, 0, -1), z_dir=(0, 1, 0))) as fillet9_piece_11a_section:
        with BuildLine():
            CenterArc((FILLET9_R, FILLET9_R), FILLET9_R, 180, 90)
            Line((0, FILLET9_R), (0, 0))
            Line((0, 0), (FILLET9_R, 0))
        make_face()
    fillet9_piece_11a = extrude(amount=40, mode=Mode.PRIVATE)
    fillet9_piece_11a = split(fillet9_piece_11a, bisect_by=Plane(origin=(-40.761523783, -21.937543528, 157.5), z_dir=(0, -1, 0)), keep=Keep.TOP, mode=Mode.PRIVATE)
    with BuildSketch(Plane(origin=(24.238476217, -21.937543528, 157.5), x_dir=(0, 0, -1), z_dir=(-1, 0, 0))) as fillet9_piece_11b_section:
        with BuildLine():
            CenterArc((FILLET9_R, FILLET9_R), FILLET9_R, 180, 90)
            Line((0, FILLET9_R), (0, 0))
            Line((0, 0), (FILLET9_R, 0))
        make_face()
    fillet9_piece_11b = extrude(amount=70, mode=Mode.PRIVATE)
    fillet9_piece_11b = split(fillet9_piece_11b, bisect_by=Plane(origin=(-40.761523783, -21.937543528, 157.5), z_dir=(-1, 0, 0)), keep=Keep.TOP, mode=Mode.PRIVATE)
    fillet9_piece_11 = fillet9_piece_11a & fillet9_piece_11b
    add(fillet9_piece_11, mode=Mode.SUBTRACT)
    with BuildSketch(Plane(origin=(-40.761523783, -21.937543528, 157.5), x_dir=(0, 0, -1), z_dir=(0, 1, 0))) as fillet9_piece_12a_section:
        with BuildLine():
            CenterArc((FILLET9_R, FILLET9_R), FILLET9_R, 180, 90)
            Line((0, FILLET9_R), (0, 0))
            Line((0, 0), (FILLET9_R, 0))
        make_face()
    fillet9_piece_12a = extrude(amount=40, mode=Mode.PRIVATE)
    fillet9_piece_12a = split(fillet9_piece_12a, bisect_by=Plane(origin=(-40.761523783, 13.062456472, 157.5), z_dir=(0, 1, 0)), keep=Keep.TOP, mode=Mode.PRIVATE)
    with BuildSketch(Plane(origin=(-45.761523783, 13.062456472, 157.5), x_dir=(0, 1, 0), z_dir=(1, 0, 0))) as fillet9_piece_12b_section:
        with BuildLine():
            CenterArc((FILLET9_R, -FILLET9_R), FILLET9_R, 90, 90)
            Line((0, -FILLET9_R), (0, 0))
            Line((0, 0), (FILLET9_R, 0))
        make_face()
    fillet9_piece_12b = extrude(amount=70, mode=Mode.PRIVATE)
    fillet9_piece_12b = split(fillet9_piece_12b, bisect_by=Plane(origin=(-40.761523783, 13.062456472, 157.5), z_dir=(-1, 0, 0)), keep=Keep.TOP, mode=Mode.PRIVATE)
    fillet9_piece_12 = fillet9_piece_12a & fillet9_piece_12b
    add(fillet9_piece_12, mode=Mode.SUBTRACT)
    with BuildSketch(Plane(origin=(24.238476217, 13.062456472, 157.5), x_dir=(0, 0, -1), z_dir=(0, -1, 0))) as fillet9_piece_13a_section:
        with BuildLine():
            CenterArc((FILLET9_R, FILLET9_R), FILLET9_R, 180, 90)
            Line((0, FILLET9_R), (0, 0))
            Line((0, 0), (FILLET9_R, 0))
        make_face()
    fillet9_piece_13a = extrude(amount=40, mode=Mode.PRIVATE)
    fillet9_piece_13a = split(fillet9_piece_13a, bisect_by=Plane(origin=(24.238476217, -21.937543528, 157.5), z_dir=(0, -1, 0)), keep=Keep.TOP, mode=Mode.PRIVATE)
    with BuildSketch(Plane(origin=(29.238476217, -21.937543528, 157.5), x_dir=(0, 0, -1), z_dir=(-1, 0, 0))) as fillet9_piece_13b_section:
        with BuildLine():
            CenterArc((FILLET9_R, FILLET9_R), FILLET9_R, 180, 90)
            Line((0, FILLET9_R), (0, 0))
            Line((0, 0), (FILLET9_R, 0))
        make_face()
    fillet9_piece_13b = extrude(amount=70, mode=Mode.PRIVATE)
    fillet9_piece_13b = split(fillet9_piece_13b, bisect_by=Plane(origin=(24.238476217, -21.937543528, 157.5), z_dir=(1, 0, 0)), keep=Keep.TOP, mode=Mode.PRIVATE)
    fillet9_piece_13 = fillet9_piece_13a & fillet9_piece_13b
    add(fillet9_piece_13, mode=Mode.SUBTRACT)
    with BuildSketch(Plane(origin=(24.238476217, 18.062456472, 157.5), x_dir=(0, 0, -1), z_dir=(0, -1, 0))) as fillet9_piece_14a_section:
        with BuildLine():
            CenterArc((FILLET9_R, FILLET9_R), FILLET9_R, 180, 90)
            Line((0, FILLET9_R), (0, 0))
            Line((0, 0), (FILLET9_R, 0))
        make_face()
    fillet9_piece_14a = extrude(amount=40, mode=Mode.PRIVATE)
    fillet9_piece_14a = split(fillet9_piece_14a, bisect_by=Plane(origin=(24.238476217, 13.062456472, 157.5), z_dir=(0, 1, 0)), keep=Keep.TOP, mode=Mode.PRIVATE)
    with BuildSketch(Plane(origin=(-40.761523783, 13.062456472, 157.5), x_dir=(0, 1, 0), z_dir=(1, 0, 0))) as fillet9_piece_14b_section:
        with BuildLine():
            CenterArc((FILLET9_R, -FILLET9_R), FILLET9_R, 90, 90)
            Line((0, -FILLET9_R), (0, 0))
            Line((0, 0), (FILLET9_R, 0))
        make_face()
    fillet9_piece_14b = extrude(amount=70, mode=Mode.PRIVATE)
    fillet9_piece_14b = split(fillet9_piece_14b, bisect_by=Plane(origin=(24.238476217, 13.062456472, 157.5), z_dir=(1, 0, 0)), keep=Keep.TOP, mode=Mode.PRIVATE)
    fillet9_piece_14 = fillet9_piece_14a & fillet9_piece_14b
    add(fillet9_piece_14, mode=Mode.SUBTRACT)
    with BuildSketch(Plane(origin=(43.113476217, 13.062456472, 128.75), x_dir=(0, 1, 0), z_dir=(0, 0, -1))) as fillet9_piece_15a_section:
        with BuildLine():
            CenterArc((FILLET9_R, -FILLET9_R), FILLET9_R, 90, 90)
            Line((0, -FILLET9_R), (0, 0))
            Line((0, 0), (FILLET9_R, 0))
        make_face()
    fillet9_piece_15a = extrude(amount=105, mode=Mode.PRIVATE)
    fillet9_piece_15a = split(fillet9_piece_15a, bisect_by=Plane(origin=(43.113476217, 13.062456472, 28.75), z_dir=(0, 0, -1)), keep=Keep.TOP, mode=Mode.PRIVATE)
    with BuildSketch(Plane(origin=(43.113476217, 18.062456472, 28.75), x_dir=(0, 0, -1), z_dir=(0, -1, 0))) as fillet9_piece_15b_section:
        with BuildLine():
            CenterArc((FILLET9_R, -FILLET9_R), FILLET9_R, 90, 90)
            Line((0, -FILLET9_R), (0, 0))
            Line((0, 0), (FILLET9_R, 0))
        make_face()
    fillet9_piece_15b = extrude(amount=36.776495021, mode=Mode.PRIVATE)
    fillet9_piece_15b = split(fillet9_piece_15b, bisect_by=Plane(origin=(43.113476217, 13.062456472, 28.75), z_dir=(0, 1, 0)), keep=Keep.TOP, mode=Mode.PRIVATE)
    fillet9_piece_15 = fillet9_piece_15a & fillet9_piece_15b
    add(fillet9_piece_15, mode=Mode.SUBTRACT)
    with BuildSketch(Plane(origin=(43.113476217, -18.714038549, 23.75), x_dir=(0, -1, 0), z_dir=(0, 0, 1))) as fillet9_piece_16a_section:
        with BuildLine():
            CenterArc((FILLET9_R, -FILLET9_R), FILLET9_R, 90, 90)
            Line((0, -FILLET9_R), (0, 0))
            Line((0, 0), (FILLET9_R, 0))
        make_face()
    fillet9_piece_16a = extrude(amount=105, mode=Mode.PRIVATE)
    fillet9_piece_16a = split(fillet9_piece_16a, bisect_by=Plane(origin=(43.113476217, -18.714038549, 28.75), z_dir=(0, 0, -1)), keep=Keep.TOP, mode=Mode.PRIVATE)
    with BuildSketch(Plane(origin=(43.113476217, 13.062456472, 28.75), x_dir=(0, 0, -1), z_dir=(0, -1, 0))) as fillet9_piece_16b_section:
        with BuildLine():
            CenterArc((FILLET9_R, -FILLET9_R), FILLET9_R, 90, 90)
            Line((0, -FILLET9_R), (0, 0))
            Line((0, 0), (FILLET9_R, 0))
        make_face()
    fillet9_piece_16b = extrude(amount=36.776495021, mode=Mode.PRIVATE)
    fillet9_piece_16b = split(fillet9_piece_16b, bisect_by=Plane(origin=(43.113476217, -18.714038549, 28.75), z_dir=(0, -1, 0)), keep=Keep.TOP, mode=Mode.PRIVATE)
    fillet9_piece_16 = fillet9_piece_16a & fillet9_piece_16b
    add(fillet9_piece_16, mode=Mode.SUBTRACT)
    with BuildSketch(Plane(origin=(43.113476217, -18.714038549, 128.75), x_dir=(0, 0, 1), z_dir=(0, 1, 0))) as fillet9_piece_17a_section:
        with BuildLine():
            CenterArc((FILLET9_R, -FILLET9_R), FILLET9_R, 90, 90)
            Line((0, -FILLET9_R), (0, 0))
            Line((0, 0), (FILLET9_R, 0))
        make_face()
    fillet9_piece_17a = extrude(amount=36.776495021, mode=Mode.PRIVATE)
    fillet9_piece_17a = split(fillet9_piece_17a, bisect_by=Plane(origin=(43.113476217, 13.062456472, 128.75), z_dir=(0, 1, 0)), keep=Keep.TOP, mode=Mode.PRIVATE)
    with BuildSketch(Plane(origin=(43.113476217, 13.062456472, 133.75), x_dir=(0, 1, 0), z_dir=(0, 0, -1))) as fillet9_piece_17b_section:
        with BuildLine():
            CenterArc((FILLET9_R, -FILLET9_R), FILLET9_R, 90, 90)
            Line((0, -FILLET9_R), (0, 0))
            Line((0, 0), (FILLET9_R, 0))
        make_face()
    fillet9_piece_17b = extrude(amount=105, mode=Mode.PRIVATE)
    fillet9_piece_17b = split(fillet9_piece_17b, bisect_by=Plane(origin=(43.113476217, 13.062456472, 128.75), z_dir=(0, 0, 1)), keep=Keep.TOP, mode=Mode.PRIVATE)
    fillet9_piece_17 = fillet9_piece_17a & fillet9_piece_17b
    add(fillet9_piece_17, mode=Mode.SUBTRACT)
    with BuildSketch(Plane(origin=(43.113476217, -23.714038549, 128.75), x_dir=(0, 0, 1), z_dir=(0, 1, 0))) as fillet9_piece_18a_section:
        with BuildLine():
            CenterArc((FILLET9_R, -FILLET9_R), FILLET9_R, 90, 90)
            Line((0, -FILLET9_R), (0, 0))
            Line((0, 0), (FILLET9_R, 0))
        make_face()
    fillet9_piece_18a = extrude(amount=36.776495021, mode=Mode.PRIVATE)
    fillet9_piece_18a = split(fillet9_piece_18a, bisect_by=Plane(origin=(43.113476217, -18.714038549, 128.75), z_dir=(0, -1, 0)), keep=Keep.TOP, mode=Mode.PRIVATE)
    with BuildSketch(Plane(origin=(43.113476217, -18.714038549, 28.75), x_dir=(0, -1, 0), z_dir=(0, 0, 1))) as fillet9_piece_18b_section:
        with BuildLine():
            CenterArc((FILLET9_R, -FILLET9_R), FILLET9_R, 90, 90)
            Line((0, -FILLET9_R), (0, 0))
            Line((0, 0), (FILLET9_R, 0))
        make_face()
    fillet9_piece_18b = extrude(amount=105, mode=Mode.PRIVATE)
    fillet9_piece_18b = split(fillet9_piece_18b, bisect_by=Plane(origin=(43.113476217, -18.714038549, 128.75), z_dir=(0, 0, 1)), keep=Keep.TOP, mode=Mode.PRIVATE)
    fillet9_piece_18 = fillet9_piece_18a & fillet9_piece_18b
    add(fillet9_piece_18, mode=Mode.SUBTRACT)

    # Sketch13 → Cut-Extrude7 (cut)
    with BuildSketch(Plane(origin=(0, 16.812456472, 0), x_dir=(1, 0, 0), z_dir=(0, 1, 0))):
        with Locations((-8.265433855, -78.746089928)):
            Rectangle(SKETCH13_W, SKETCH13_H)
    extrude(amount=-CUT_EXTRUDE7_DEPTH, mode=Mode.SUBTRACT)


solid = part.part
